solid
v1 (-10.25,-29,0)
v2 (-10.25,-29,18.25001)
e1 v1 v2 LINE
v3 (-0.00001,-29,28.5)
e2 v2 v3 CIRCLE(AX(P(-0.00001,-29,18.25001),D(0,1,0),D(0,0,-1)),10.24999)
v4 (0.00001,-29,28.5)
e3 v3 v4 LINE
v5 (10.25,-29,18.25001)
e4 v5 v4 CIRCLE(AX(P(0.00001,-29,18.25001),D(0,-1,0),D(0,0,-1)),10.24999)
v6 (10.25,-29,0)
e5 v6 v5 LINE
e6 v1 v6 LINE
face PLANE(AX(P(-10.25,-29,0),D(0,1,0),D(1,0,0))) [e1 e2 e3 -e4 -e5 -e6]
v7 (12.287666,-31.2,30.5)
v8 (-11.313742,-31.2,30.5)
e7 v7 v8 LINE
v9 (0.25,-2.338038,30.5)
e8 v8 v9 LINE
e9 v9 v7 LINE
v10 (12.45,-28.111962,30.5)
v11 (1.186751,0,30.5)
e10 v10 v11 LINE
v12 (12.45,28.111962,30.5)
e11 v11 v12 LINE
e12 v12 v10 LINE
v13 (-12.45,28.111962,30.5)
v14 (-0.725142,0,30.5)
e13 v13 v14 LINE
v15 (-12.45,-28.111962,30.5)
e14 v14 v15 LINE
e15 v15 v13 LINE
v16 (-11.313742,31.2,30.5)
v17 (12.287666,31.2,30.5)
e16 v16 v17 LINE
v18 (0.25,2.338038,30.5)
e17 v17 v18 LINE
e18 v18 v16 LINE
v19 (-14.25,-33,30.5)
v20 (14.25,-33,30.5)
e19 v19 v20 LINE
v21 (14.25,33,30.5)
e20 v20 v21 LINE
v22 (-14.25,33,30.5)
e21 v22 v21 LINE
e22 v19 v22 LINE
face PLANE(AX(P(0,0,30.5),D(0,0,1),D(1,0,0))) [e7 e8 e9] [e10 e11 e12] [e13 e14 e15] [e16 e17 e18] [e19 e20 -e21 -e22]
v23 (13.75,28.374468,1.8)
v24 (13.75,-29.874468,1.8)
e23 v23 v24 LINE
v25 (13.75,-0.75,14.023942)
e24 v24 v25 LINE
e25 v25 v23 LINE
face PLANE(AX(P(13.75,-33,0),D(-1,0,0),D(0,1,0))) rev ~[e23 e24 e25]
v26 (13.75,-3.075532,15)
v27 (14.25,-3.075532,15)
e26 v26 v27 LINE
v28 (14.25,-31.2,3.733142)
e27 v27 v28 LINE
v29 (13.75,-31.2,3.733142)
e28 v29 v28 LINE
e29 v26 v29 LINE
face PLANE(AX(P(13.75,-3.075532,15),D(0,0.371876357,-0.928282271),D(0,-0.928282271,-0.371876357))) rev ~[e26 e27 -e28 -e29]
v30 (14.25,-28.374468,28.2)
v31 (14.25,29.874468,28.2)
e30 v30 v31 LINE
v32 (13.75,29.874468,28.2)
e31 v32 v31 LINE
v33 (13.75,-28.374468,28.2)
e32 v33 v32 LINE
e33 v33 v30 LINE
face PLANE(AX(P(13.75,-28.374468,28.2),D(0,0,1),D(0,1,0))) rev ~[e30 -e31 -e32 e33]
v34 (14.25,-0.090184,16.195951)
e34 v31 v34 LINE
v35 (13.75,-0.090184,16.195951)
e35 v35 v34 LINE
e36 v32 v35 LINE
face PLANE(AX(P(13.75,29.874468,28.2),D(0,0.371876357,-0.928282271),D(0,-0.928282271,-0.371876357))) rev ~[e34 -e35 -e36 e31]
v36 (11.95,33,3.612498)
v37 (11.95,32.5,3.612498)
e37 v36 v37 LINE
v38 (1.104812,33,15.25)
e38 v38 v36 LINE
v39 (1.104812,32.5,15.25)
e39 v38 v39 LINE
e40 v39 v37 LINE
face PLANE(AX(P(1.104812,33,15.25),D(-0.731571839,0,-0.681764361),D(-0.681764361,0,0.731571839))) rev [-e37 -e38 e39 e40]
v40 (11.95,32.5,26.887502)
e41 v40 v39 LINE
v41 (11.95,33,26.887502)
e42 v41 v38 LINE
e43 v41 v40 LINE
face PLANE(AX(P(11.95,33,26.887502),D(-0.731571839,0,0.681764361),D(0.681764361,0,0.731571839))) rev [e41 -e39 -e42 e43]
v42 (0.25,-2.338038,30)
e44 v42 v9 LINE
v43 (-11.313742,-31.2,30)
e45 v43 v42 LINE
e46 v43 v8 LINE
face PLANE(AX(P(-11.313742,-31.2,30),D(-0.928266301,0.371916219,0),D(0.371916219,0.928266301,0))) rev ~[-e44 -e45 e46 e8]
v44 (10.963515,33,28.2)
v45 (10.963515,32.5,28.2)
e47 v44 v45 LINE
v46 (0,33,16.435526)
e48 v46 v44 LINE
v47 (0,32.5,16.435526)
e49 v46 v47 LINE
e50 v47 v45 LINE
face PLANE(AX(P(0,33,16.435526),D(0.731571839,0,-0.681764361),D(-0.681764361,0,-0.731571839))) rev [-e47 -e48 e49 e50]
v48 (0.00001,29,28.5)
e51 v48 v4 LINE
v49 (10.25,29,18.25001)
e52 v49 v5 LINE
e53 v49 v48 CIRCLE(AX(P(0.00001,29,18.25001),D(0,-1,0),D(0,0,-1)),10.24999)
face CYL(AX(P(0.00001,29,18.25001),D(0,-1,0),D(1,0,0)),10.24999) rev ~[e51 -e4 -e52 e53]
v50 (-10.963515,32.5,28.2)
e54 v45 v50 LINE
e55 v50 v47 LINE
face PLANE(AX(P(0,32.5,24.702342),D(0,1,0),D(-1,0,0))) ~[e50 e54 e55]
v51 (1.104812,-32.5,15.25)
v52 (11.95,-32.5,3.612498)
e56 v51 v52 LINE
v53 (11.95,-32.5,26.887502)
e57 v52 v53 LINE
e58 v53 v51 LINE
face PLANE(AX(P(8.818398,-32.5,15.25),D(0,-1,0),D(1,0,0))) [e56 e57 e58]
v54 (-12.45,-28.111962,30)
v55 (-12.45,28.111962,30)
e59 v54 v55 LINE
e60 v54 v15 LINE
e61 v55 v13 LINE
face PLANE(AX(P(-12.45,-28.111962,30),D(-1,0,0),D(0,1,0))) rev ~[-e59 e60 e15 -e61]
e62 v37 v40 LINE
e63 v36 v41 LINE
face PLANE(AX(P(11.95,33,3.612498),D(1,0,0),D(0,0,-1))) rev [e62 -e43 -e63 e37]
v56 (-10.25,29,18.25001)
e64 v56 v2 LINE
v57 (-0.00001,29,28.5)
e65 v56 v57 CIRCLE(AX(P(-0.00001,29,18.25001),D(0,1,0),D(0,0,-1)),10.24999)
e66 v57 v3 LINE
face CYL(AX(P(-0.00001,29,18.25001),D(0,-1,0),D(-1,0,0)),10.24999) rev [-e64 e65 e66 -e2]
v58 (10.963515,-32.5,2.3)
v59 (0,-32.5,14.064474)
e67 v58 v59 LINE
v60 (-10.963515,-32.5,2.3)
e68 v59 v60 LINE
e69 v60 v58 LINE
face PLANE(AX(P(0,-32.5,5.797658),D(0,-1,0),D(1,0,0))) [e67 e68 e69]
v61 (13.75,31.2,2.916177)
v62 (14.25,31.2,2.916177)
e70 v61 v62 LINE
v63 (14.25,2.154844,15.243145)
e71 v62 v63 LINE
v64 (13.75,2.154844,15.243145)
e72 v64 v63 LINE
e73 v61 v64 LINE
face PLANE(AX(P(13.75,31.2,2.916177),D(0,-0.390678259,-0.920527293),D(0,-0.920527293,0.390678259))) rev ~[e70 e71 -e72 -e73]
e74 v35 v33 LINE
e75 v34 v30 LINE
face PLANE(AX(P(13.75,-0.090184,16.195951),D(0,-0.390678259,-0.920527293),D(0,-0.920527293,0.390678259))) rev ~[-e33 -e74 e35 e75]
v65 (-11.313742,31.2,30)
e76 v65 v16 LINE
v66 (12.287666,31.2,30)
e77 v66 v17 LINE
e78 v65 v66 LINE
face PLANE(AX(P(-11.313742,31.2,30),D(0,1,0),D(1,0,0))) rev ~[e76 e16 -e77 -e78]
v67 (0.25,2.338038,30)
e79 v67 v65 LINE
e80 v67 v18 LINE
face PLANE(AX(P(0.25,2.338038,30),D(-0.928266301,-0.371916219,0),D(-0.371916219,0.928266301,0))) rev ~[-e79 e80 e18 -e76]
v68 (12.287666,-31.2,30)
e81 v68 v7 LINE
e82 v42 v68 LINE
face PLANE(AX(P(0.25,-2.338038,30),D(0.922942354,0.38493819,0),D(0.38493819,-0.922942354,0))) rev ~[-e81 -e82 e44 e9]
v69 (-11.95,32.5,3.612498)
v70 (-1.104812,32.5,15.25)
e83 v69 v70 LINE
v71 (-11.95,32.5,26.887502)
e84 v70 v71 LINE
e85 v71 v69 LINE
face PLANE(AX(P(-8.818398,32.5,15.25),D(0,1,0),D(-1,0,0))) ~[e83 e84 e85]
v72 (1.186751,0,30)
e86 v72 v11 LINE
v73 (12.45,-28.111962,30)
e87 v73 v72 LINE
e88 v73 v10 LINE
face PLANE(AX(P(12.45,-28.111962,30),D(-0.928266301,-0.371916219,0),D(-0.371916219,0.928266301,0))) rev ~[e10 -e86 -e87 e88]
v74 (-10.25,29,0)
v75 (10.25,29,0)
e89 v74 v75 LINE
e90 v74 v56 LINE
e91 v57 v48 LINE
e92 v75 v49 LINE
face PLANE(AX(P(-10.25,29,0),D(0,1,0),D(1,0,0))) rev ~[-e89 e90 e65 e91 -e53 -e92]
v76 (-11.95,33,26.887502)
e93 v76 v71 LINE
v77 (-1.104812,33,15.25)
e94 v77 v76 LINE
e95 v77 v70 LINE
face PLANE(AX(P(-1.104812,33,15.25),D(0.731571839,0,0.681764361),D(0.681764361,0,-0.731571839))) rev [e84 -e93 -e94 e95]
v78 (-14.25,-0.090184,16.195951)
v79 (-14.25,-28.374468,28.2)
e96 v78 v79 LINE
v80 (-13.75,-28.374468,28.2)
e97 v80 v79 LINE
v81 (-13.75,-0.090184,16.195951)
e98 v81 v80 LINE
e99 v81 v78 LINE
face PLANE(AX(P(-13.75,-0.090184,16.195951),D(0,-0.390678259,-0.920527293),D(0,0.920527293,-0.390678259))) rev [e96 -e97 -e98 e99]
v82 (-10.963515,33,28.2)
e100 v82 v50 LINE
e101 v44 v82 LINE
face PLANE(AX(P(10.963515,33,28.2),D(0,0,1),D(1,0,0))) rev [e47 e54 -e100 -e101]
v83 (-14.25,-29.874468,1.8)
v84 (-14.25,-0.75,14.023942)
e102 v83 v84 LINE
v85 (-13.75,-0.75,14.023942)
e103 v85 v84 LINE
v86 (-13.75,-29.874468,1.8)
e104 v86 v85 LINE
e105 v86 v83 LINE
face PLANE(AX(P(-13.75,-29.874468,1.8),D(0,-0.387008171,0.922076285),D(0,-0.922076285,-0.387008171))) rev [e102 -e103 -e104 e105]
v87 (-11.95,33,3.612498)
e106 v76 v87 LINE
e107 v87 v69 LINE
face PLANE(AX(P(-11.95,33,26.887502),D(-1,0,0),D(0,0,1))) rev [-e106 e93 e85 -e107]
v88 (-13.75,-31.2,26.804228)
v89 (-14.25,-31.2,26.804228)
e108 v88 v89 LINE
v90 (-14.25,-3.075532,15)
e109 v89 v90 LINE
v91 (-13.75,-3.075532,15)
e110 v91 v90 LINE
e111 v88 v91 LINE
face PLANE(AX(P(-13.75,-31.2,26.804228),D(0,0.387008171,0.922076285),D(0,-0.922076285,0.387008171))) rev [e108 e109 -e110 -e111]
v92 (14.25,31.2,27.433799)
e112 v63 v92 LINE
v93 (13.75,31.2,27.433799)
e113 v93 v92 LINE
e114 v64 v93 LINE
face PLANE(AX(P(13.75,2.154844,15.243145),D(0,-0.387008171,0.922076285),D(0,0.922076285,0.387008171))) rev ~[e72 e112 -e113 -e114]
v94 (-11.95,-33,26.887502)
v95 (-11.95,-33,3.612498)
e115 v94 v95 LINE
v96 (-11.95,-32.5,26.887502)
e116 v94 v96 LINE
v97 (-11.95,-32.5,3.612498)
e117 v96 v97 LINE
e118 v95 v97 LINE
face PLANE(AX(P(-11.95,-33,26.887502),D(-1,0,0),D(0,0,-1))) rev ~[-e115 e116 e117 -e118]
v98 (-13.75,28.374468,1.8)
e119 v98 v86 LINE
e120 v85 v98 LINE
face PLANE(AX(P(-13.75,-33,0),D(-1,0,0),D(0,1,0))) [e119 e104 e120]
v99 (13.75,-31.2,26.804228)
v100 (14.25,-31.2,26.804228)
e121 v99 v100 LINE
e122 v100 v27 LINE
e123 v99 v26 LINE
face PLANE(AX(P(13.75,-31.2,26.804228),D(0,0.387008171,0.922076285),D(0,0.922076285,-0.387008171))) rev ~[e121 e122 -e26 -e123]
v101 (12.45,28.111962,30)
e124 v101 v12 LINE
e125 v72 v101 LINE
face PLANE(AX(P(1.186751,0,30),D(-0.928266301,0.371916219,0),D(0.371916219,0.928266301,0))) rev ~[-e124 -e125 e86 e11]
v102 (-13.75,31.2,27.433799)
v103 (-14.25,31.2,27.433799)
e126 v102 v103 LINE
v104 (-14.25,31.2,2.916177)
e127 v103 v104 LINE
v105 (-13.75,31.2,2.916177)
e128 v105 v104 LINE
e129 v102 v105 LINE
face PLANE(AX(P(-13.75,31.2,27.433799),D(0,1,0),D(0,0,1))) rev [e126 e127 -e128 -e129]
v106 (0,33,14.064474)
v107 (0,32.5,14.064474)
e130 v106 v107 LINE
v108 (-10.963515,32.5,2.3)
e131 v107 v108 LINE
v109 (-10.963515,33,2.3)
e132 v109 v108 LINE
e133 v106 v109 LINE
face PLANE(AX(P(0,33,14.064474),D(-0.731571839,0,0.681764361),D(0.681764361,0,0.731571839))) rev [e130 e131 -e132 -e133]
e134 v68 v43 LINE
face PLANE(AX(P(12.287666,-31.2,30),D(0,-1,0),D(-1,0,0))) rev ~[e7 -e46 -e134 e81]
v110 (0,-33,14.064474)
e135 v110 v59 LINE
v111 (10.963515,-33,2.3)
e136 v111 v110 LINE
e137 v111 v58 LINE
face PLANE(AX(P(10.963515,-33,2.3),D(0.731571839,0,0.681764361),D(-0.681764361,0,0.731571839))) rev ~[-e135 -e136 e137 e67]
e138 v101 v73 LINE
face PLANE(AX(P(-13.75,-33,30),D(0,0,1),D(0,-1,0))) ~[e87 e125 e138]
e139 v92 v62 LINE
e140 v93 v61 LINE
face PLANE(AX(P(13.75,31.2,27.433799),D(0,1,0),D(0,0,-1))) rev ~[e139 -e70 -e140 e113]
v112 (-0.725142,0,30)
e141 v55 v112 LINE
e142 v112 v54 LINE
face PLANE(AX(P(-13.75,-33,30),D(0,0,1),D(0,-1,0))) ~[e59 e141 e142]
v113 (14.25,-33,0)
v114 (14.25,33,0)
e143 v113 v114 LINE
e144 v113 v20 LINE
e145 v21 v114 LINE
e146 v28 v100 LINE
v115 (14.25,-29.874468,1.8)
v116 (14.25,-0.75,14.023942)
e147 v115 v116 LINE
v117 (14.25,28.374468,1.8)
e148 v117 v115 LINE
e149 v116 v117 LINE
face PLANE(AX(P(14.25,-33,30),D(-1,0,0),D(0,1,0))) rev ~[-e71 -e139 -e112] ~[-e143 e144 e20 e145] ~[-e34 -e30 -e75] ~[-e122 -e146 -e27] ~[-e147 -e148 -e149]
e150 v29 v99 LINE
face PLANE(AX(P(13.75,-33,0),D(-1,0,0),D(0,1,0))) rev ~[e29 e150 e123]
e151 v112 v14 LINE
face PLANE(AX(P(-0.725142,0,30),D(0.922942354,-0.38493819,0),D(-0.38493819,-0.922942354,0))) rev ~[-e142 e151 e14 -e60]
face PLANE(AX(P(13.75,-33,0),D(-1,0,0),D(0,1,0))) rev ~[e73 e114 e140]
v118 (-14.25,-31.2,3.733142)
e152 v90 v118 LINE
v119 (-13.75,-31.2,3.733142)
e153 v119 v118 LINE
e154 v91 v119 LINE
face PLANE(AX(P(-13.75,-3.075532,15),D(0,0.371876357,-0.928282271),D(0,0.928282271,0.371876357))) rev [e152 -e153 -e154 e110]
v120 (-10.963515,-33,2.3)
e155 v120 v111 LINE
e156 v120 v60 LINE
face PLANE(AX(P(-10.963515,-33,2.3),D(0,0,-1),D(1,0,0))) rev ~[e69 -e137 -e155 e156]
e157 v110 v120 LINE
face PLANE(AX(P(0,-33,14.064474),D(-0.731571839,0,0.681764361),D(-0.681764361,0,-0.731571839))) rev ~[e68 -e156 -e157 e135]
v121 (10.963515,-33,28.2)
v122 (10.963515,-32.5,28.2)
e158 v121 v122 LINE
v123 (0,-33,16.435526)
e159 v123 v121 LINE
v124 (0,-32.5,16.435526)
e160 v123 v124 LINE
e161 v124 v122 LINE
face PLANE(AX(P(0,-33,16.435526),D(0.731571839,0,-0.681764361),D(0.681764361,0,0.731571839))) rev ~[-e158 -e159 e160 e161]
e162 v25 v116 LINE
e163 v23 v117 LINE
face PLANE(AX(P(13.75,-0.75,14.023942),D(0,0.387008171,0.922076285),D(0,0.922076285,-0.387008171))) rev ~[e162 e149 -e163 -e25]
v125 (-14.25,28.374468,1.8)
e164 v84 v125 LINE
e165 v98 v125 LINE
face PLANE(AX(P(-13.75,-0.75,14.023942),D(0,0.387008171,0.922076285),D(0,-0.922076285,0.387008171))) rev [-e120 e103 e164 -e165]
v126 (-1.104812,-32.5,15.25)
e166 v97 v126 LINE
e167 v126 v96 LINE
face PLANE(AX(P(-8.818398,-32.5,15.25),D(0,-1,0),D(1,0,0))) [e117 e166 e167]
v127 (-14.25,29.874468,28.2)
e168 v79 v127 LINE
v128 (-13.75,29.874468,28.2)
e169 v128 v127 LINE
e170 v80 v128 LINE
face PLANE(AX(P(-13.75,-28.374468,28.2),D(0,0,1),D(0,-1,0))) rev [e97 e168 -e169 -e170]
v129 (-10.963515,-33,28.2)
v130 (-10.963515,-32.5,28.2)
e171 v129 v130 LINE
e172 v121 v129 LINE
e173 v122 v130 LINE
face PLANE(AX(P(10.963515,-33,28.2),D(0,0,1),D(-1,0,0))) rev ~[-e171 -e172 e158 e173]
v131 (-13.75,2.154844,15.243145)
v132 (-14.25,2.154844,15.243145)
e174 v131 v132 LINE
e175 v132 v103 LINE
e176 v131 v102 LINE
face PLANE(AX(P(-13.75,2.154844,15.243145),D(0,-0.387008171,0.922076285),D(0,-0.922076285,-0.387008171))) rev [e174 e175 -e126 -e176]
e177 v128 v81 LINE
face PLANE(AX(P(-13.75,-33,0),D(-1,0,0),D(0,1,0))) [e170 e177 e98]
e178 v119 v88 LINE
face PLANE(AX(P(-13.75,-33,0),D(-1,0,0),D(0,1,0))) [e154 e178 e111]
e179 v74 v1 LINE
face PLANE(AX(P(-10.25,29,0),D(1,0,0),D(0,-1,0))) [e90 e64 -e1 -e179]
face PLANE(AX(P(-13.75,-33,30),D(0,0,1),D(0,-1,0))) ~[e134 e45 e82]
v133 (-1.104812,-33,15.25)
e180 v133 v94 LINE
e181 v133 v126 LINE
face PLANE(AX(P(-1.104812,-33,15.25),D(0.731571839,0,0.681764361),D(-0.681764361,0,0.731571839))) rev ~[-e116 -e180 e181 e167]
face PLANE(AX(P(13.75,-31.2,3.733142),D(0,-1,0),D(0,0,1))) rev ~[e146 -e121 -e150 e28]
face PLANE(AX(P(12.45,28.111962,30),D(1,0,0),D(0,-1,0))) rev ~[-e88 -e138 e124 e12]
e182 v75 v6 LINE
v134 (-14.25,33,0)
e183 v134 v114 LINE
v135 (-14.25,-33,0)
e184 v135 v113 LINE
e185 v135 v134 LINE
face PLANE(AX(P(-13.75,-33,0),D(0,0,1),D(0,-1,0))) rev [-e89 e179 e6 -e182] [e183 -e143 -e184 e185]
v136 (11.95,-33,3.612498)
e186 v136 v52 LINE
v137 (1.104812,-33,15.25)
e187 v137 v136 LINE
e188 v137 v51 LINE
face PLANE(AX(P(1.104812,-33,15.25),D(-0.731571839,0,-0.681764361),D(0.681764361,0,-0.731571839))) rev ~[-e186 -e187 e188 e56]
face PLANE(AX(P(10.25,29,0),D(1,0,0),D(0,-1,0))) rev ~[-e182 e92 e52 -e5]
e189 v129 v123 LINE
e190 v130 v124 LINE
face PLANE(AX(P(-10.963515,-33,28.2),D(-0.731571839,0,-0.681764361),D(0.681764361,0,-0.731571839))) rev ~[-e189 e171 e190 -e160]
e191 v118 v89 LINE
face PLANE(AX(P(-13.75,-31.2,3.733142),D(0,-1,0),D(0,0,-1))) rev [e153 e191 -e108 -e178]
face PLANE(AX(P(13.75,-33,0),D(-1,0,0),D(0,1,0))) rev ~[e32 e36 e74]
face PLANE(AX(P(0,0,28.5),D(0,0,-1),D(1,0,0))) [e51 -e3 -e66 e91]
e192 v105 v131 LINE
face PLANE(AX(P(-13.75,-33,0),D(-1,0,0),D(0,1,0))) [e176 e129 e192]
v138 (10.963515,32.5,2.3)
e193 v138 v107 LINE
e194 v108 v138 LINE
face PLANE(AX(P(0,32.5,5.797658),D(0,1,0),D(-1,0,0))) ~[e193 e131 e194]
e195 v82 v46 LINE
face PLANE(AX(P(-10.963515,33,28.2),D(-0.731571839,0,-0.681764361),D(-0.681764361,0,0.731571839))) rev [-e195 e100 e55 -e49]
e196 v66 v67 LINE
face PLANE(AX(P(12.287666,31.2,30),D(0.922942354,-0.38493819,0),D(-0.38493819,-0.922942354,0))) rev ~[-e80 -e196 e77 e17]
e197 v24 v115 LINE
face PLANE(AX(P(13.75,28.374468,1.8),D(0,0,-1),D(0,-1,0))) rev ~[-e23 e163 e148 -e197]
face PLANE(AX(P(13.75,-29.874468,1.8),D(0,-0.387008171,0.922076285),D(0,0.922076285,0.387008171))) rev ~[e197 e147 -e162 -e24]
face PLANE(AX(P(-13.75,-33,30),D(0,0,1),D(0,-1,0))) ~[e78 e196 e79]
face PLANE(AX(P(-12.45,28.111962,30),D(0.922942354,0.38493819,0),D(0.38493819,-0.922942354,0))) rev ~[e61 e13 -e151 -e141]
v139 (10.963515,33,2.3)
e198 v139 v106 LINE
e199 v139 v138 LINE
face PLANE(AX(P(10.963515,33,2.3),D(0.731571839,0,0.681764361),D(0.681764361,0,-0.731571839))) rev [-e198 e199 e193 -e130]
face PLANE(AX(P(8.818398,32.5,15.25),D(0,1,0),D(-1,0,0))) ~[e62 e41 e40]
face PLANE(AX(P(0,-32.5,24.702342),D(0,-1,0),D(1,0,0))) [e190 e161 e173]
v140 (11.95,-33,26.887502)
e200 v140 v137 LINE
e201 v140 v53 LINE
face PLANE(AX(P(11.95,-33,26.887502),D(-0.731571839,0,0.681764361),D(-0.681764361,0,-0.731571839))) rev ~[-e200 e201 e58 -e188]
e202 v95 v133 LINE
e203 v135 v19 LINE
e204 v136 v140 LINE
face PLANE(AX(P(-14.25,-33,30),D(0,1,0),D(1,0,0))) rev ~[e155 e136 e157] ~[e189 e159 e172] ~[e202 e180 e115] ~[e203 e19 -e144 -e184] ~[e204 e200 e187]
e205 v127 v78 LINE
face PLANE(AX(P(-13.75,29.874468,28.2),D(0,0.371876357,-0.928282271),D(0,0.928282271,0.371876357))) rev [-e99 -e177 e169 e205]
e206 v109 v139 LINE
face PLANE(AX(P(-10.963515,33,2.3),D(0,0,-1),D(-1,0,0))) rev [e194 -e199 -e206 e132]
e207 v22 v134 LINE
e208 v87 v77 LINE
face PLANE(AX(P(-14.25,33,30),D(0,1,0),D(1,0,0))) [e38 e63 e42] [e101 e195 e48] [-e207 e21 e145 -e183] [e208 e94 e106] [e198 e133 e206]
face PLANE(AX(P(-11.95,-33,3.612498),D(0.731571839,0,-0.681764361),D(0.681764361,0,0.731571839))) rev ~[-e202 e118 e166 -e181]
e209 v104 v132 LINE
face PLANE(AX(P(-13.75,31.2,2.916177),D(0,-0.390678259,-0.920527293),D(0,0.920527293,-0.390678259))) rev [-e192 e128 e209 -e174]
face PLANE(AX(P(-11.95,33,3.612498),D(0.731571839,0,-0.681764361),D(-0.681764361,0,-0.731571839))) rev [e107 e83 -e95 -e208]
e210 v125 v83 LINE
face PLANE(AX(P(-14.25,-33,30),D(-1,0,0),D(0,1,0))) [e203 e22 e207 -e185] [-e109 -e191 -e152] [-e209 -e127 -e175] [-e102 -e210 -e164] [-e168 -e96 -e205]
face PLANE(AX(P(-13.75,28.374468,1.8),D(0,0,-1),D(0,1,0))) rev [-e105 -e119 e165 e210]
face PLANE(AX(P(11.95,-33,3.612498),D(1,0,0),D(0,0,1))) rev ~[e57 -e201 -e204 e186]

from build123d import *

# Parameters (mm, degrees)
F0_W     = 27.5
F0_H     = 66
F1_DEPTH = 30
F2_W     = 66
F2_H     = 30
F3_DEPTH = 0.5
F4_W     = 28.5
F4_H     = 66
F5_DEPTH = 0.5
F7_DEPTH = 0.5
F8_W     = 20.5
F8_H     = 58
F9_DEPTH = 28.5
F10_R    = 10.24999


# Not quite as in the source:
# - two fillets or chamfers of one size are made in one step
# - a fillet or chamfer is up to 0.001 mm smaller than in the source, because OpenCascade refuses the exact size
# - a pattern or mirror of a feature is missing from the dataset's text; its kind, count and spacing are read off the source's solid


with BuildPart() as f1:
    # F0 (on Top) → F1 (new body)
    with BuildSketch(Plane.XY):
        Rectangle(F0_W, F0_H)
    extrude(amount=F1_DEPTH)

    # F2 (on face) → F3 (join)
    with BuildSketch(Plane.YZ.offset(13.75)):
        with Locations((0, 15)):
            Rectangle(F2_W, F2_H)
        Polygon((28.3744677029, 1.8), (-29.8744677029, 1.8), (-0.75, 14.0239419294), align=None, mode=Mode.SUBTRACT)
        Polygon((-31.2, 3.7331419218), (-31.2, 26.8042280979), (-3.0755322971, 15), align=None, mode=Mode.SUBTRACT)
        Polygon((-0.0901844103, 16.195951202), (-28.3744677029, 28.2), (29.8744677029, 28.2), align=None, mode=Mode.SUBTRACT)
        Polygon((31.2, 27.4337988451), (31.2, 2.9161768244), (2.1548442575, 15.2431452425), align=None, mode=Mode.SUBTRACT)
    f3 = extrude(amount=F3_DEPTH)

    # F3_copies: F3 across plane
    add(f3.mirror(Plane(origin=(0, 0, 0), x_dir=(0, 0, -1), z_dir=(-1, 0, 0))))

    # F4 (on face) → F5 (join)
    with BuildSketch(Plane.XY.offset(30)):
        Rectangle(F4_W, F4_H)
        Polygon((0.25, -2.338037696), (12.2876657229, -31.2), (-11.3137418755, -31.2), align=None, mode=Mode.SUBTRACT)
        Polygon((-0.7251421589, 0), (-12.45, -28.111962304), (-12.45, 28.111962304), align=None, mode=Mode.SUBTRACT)
        Polygon((1.1867507353, 0), (12.45, 28.111962304), (12.45, -28.111962304), align=None, mode=Mode.SUBTRACT)
        Polygon((0.25, 2.338037696), (-11.3137418755, 31.2), (12.2876657229, 31.2), align=None, mode=Mode.SUBTRACT)
    extrude(amount=F5_DEPTH)

    # F6 (on face) → F7 (cut)
    with BuildSketch(Plane.XZ.offset(33)):
        Polygon((0, 14.0644738981), (-10.9635152767, 2.3), (10.9635152767, 2.3), align=None)
        Polygon((-1.1048121354, 15.25), (-11.95, 26.8875018716), (-11.95, 3.6124981284), align=None)
        Polygon((0, 16.4355261019), (10.9635152767, 28.2), (-10.9635152767, 28.2), align=None)
        Polygon((1.1048121354, 15.25), (11.95, 3.6124981284), (11.95, 26.8875018716), align=None)
    f7 = extrude(amount=-F7_DEPTH, mode=Mode.SUBTRACT)

    # F7_copies: F7 across plane
    add(f7.mirror(Plane.ZX), mode=Mode.SUBTRACT)

    # F8 (on face) → F9 (cut)
    with BuildSketch(Plane(origin=(0, 0, 0), x_dir=(1, 0, 0), z_dir=(0, 0, -1))):
        Rectangle(F8_W, F8_H)
    extrude(amount=-F9_DEPTH, mode=Mode.SUBTRACT)

    # F10 (radius 10.25 in the source; OpenCascade refuses exactly that, so slightly less here)
    f10_edges = [f1.edges().sort_by_distance(p)[0] for p in [
        (-10.25, 0, 28.5),
        (10.25, 0, 28.5),
    ]]
    fillet(f10_edges, radius=F10_R)


solid = f1.part
